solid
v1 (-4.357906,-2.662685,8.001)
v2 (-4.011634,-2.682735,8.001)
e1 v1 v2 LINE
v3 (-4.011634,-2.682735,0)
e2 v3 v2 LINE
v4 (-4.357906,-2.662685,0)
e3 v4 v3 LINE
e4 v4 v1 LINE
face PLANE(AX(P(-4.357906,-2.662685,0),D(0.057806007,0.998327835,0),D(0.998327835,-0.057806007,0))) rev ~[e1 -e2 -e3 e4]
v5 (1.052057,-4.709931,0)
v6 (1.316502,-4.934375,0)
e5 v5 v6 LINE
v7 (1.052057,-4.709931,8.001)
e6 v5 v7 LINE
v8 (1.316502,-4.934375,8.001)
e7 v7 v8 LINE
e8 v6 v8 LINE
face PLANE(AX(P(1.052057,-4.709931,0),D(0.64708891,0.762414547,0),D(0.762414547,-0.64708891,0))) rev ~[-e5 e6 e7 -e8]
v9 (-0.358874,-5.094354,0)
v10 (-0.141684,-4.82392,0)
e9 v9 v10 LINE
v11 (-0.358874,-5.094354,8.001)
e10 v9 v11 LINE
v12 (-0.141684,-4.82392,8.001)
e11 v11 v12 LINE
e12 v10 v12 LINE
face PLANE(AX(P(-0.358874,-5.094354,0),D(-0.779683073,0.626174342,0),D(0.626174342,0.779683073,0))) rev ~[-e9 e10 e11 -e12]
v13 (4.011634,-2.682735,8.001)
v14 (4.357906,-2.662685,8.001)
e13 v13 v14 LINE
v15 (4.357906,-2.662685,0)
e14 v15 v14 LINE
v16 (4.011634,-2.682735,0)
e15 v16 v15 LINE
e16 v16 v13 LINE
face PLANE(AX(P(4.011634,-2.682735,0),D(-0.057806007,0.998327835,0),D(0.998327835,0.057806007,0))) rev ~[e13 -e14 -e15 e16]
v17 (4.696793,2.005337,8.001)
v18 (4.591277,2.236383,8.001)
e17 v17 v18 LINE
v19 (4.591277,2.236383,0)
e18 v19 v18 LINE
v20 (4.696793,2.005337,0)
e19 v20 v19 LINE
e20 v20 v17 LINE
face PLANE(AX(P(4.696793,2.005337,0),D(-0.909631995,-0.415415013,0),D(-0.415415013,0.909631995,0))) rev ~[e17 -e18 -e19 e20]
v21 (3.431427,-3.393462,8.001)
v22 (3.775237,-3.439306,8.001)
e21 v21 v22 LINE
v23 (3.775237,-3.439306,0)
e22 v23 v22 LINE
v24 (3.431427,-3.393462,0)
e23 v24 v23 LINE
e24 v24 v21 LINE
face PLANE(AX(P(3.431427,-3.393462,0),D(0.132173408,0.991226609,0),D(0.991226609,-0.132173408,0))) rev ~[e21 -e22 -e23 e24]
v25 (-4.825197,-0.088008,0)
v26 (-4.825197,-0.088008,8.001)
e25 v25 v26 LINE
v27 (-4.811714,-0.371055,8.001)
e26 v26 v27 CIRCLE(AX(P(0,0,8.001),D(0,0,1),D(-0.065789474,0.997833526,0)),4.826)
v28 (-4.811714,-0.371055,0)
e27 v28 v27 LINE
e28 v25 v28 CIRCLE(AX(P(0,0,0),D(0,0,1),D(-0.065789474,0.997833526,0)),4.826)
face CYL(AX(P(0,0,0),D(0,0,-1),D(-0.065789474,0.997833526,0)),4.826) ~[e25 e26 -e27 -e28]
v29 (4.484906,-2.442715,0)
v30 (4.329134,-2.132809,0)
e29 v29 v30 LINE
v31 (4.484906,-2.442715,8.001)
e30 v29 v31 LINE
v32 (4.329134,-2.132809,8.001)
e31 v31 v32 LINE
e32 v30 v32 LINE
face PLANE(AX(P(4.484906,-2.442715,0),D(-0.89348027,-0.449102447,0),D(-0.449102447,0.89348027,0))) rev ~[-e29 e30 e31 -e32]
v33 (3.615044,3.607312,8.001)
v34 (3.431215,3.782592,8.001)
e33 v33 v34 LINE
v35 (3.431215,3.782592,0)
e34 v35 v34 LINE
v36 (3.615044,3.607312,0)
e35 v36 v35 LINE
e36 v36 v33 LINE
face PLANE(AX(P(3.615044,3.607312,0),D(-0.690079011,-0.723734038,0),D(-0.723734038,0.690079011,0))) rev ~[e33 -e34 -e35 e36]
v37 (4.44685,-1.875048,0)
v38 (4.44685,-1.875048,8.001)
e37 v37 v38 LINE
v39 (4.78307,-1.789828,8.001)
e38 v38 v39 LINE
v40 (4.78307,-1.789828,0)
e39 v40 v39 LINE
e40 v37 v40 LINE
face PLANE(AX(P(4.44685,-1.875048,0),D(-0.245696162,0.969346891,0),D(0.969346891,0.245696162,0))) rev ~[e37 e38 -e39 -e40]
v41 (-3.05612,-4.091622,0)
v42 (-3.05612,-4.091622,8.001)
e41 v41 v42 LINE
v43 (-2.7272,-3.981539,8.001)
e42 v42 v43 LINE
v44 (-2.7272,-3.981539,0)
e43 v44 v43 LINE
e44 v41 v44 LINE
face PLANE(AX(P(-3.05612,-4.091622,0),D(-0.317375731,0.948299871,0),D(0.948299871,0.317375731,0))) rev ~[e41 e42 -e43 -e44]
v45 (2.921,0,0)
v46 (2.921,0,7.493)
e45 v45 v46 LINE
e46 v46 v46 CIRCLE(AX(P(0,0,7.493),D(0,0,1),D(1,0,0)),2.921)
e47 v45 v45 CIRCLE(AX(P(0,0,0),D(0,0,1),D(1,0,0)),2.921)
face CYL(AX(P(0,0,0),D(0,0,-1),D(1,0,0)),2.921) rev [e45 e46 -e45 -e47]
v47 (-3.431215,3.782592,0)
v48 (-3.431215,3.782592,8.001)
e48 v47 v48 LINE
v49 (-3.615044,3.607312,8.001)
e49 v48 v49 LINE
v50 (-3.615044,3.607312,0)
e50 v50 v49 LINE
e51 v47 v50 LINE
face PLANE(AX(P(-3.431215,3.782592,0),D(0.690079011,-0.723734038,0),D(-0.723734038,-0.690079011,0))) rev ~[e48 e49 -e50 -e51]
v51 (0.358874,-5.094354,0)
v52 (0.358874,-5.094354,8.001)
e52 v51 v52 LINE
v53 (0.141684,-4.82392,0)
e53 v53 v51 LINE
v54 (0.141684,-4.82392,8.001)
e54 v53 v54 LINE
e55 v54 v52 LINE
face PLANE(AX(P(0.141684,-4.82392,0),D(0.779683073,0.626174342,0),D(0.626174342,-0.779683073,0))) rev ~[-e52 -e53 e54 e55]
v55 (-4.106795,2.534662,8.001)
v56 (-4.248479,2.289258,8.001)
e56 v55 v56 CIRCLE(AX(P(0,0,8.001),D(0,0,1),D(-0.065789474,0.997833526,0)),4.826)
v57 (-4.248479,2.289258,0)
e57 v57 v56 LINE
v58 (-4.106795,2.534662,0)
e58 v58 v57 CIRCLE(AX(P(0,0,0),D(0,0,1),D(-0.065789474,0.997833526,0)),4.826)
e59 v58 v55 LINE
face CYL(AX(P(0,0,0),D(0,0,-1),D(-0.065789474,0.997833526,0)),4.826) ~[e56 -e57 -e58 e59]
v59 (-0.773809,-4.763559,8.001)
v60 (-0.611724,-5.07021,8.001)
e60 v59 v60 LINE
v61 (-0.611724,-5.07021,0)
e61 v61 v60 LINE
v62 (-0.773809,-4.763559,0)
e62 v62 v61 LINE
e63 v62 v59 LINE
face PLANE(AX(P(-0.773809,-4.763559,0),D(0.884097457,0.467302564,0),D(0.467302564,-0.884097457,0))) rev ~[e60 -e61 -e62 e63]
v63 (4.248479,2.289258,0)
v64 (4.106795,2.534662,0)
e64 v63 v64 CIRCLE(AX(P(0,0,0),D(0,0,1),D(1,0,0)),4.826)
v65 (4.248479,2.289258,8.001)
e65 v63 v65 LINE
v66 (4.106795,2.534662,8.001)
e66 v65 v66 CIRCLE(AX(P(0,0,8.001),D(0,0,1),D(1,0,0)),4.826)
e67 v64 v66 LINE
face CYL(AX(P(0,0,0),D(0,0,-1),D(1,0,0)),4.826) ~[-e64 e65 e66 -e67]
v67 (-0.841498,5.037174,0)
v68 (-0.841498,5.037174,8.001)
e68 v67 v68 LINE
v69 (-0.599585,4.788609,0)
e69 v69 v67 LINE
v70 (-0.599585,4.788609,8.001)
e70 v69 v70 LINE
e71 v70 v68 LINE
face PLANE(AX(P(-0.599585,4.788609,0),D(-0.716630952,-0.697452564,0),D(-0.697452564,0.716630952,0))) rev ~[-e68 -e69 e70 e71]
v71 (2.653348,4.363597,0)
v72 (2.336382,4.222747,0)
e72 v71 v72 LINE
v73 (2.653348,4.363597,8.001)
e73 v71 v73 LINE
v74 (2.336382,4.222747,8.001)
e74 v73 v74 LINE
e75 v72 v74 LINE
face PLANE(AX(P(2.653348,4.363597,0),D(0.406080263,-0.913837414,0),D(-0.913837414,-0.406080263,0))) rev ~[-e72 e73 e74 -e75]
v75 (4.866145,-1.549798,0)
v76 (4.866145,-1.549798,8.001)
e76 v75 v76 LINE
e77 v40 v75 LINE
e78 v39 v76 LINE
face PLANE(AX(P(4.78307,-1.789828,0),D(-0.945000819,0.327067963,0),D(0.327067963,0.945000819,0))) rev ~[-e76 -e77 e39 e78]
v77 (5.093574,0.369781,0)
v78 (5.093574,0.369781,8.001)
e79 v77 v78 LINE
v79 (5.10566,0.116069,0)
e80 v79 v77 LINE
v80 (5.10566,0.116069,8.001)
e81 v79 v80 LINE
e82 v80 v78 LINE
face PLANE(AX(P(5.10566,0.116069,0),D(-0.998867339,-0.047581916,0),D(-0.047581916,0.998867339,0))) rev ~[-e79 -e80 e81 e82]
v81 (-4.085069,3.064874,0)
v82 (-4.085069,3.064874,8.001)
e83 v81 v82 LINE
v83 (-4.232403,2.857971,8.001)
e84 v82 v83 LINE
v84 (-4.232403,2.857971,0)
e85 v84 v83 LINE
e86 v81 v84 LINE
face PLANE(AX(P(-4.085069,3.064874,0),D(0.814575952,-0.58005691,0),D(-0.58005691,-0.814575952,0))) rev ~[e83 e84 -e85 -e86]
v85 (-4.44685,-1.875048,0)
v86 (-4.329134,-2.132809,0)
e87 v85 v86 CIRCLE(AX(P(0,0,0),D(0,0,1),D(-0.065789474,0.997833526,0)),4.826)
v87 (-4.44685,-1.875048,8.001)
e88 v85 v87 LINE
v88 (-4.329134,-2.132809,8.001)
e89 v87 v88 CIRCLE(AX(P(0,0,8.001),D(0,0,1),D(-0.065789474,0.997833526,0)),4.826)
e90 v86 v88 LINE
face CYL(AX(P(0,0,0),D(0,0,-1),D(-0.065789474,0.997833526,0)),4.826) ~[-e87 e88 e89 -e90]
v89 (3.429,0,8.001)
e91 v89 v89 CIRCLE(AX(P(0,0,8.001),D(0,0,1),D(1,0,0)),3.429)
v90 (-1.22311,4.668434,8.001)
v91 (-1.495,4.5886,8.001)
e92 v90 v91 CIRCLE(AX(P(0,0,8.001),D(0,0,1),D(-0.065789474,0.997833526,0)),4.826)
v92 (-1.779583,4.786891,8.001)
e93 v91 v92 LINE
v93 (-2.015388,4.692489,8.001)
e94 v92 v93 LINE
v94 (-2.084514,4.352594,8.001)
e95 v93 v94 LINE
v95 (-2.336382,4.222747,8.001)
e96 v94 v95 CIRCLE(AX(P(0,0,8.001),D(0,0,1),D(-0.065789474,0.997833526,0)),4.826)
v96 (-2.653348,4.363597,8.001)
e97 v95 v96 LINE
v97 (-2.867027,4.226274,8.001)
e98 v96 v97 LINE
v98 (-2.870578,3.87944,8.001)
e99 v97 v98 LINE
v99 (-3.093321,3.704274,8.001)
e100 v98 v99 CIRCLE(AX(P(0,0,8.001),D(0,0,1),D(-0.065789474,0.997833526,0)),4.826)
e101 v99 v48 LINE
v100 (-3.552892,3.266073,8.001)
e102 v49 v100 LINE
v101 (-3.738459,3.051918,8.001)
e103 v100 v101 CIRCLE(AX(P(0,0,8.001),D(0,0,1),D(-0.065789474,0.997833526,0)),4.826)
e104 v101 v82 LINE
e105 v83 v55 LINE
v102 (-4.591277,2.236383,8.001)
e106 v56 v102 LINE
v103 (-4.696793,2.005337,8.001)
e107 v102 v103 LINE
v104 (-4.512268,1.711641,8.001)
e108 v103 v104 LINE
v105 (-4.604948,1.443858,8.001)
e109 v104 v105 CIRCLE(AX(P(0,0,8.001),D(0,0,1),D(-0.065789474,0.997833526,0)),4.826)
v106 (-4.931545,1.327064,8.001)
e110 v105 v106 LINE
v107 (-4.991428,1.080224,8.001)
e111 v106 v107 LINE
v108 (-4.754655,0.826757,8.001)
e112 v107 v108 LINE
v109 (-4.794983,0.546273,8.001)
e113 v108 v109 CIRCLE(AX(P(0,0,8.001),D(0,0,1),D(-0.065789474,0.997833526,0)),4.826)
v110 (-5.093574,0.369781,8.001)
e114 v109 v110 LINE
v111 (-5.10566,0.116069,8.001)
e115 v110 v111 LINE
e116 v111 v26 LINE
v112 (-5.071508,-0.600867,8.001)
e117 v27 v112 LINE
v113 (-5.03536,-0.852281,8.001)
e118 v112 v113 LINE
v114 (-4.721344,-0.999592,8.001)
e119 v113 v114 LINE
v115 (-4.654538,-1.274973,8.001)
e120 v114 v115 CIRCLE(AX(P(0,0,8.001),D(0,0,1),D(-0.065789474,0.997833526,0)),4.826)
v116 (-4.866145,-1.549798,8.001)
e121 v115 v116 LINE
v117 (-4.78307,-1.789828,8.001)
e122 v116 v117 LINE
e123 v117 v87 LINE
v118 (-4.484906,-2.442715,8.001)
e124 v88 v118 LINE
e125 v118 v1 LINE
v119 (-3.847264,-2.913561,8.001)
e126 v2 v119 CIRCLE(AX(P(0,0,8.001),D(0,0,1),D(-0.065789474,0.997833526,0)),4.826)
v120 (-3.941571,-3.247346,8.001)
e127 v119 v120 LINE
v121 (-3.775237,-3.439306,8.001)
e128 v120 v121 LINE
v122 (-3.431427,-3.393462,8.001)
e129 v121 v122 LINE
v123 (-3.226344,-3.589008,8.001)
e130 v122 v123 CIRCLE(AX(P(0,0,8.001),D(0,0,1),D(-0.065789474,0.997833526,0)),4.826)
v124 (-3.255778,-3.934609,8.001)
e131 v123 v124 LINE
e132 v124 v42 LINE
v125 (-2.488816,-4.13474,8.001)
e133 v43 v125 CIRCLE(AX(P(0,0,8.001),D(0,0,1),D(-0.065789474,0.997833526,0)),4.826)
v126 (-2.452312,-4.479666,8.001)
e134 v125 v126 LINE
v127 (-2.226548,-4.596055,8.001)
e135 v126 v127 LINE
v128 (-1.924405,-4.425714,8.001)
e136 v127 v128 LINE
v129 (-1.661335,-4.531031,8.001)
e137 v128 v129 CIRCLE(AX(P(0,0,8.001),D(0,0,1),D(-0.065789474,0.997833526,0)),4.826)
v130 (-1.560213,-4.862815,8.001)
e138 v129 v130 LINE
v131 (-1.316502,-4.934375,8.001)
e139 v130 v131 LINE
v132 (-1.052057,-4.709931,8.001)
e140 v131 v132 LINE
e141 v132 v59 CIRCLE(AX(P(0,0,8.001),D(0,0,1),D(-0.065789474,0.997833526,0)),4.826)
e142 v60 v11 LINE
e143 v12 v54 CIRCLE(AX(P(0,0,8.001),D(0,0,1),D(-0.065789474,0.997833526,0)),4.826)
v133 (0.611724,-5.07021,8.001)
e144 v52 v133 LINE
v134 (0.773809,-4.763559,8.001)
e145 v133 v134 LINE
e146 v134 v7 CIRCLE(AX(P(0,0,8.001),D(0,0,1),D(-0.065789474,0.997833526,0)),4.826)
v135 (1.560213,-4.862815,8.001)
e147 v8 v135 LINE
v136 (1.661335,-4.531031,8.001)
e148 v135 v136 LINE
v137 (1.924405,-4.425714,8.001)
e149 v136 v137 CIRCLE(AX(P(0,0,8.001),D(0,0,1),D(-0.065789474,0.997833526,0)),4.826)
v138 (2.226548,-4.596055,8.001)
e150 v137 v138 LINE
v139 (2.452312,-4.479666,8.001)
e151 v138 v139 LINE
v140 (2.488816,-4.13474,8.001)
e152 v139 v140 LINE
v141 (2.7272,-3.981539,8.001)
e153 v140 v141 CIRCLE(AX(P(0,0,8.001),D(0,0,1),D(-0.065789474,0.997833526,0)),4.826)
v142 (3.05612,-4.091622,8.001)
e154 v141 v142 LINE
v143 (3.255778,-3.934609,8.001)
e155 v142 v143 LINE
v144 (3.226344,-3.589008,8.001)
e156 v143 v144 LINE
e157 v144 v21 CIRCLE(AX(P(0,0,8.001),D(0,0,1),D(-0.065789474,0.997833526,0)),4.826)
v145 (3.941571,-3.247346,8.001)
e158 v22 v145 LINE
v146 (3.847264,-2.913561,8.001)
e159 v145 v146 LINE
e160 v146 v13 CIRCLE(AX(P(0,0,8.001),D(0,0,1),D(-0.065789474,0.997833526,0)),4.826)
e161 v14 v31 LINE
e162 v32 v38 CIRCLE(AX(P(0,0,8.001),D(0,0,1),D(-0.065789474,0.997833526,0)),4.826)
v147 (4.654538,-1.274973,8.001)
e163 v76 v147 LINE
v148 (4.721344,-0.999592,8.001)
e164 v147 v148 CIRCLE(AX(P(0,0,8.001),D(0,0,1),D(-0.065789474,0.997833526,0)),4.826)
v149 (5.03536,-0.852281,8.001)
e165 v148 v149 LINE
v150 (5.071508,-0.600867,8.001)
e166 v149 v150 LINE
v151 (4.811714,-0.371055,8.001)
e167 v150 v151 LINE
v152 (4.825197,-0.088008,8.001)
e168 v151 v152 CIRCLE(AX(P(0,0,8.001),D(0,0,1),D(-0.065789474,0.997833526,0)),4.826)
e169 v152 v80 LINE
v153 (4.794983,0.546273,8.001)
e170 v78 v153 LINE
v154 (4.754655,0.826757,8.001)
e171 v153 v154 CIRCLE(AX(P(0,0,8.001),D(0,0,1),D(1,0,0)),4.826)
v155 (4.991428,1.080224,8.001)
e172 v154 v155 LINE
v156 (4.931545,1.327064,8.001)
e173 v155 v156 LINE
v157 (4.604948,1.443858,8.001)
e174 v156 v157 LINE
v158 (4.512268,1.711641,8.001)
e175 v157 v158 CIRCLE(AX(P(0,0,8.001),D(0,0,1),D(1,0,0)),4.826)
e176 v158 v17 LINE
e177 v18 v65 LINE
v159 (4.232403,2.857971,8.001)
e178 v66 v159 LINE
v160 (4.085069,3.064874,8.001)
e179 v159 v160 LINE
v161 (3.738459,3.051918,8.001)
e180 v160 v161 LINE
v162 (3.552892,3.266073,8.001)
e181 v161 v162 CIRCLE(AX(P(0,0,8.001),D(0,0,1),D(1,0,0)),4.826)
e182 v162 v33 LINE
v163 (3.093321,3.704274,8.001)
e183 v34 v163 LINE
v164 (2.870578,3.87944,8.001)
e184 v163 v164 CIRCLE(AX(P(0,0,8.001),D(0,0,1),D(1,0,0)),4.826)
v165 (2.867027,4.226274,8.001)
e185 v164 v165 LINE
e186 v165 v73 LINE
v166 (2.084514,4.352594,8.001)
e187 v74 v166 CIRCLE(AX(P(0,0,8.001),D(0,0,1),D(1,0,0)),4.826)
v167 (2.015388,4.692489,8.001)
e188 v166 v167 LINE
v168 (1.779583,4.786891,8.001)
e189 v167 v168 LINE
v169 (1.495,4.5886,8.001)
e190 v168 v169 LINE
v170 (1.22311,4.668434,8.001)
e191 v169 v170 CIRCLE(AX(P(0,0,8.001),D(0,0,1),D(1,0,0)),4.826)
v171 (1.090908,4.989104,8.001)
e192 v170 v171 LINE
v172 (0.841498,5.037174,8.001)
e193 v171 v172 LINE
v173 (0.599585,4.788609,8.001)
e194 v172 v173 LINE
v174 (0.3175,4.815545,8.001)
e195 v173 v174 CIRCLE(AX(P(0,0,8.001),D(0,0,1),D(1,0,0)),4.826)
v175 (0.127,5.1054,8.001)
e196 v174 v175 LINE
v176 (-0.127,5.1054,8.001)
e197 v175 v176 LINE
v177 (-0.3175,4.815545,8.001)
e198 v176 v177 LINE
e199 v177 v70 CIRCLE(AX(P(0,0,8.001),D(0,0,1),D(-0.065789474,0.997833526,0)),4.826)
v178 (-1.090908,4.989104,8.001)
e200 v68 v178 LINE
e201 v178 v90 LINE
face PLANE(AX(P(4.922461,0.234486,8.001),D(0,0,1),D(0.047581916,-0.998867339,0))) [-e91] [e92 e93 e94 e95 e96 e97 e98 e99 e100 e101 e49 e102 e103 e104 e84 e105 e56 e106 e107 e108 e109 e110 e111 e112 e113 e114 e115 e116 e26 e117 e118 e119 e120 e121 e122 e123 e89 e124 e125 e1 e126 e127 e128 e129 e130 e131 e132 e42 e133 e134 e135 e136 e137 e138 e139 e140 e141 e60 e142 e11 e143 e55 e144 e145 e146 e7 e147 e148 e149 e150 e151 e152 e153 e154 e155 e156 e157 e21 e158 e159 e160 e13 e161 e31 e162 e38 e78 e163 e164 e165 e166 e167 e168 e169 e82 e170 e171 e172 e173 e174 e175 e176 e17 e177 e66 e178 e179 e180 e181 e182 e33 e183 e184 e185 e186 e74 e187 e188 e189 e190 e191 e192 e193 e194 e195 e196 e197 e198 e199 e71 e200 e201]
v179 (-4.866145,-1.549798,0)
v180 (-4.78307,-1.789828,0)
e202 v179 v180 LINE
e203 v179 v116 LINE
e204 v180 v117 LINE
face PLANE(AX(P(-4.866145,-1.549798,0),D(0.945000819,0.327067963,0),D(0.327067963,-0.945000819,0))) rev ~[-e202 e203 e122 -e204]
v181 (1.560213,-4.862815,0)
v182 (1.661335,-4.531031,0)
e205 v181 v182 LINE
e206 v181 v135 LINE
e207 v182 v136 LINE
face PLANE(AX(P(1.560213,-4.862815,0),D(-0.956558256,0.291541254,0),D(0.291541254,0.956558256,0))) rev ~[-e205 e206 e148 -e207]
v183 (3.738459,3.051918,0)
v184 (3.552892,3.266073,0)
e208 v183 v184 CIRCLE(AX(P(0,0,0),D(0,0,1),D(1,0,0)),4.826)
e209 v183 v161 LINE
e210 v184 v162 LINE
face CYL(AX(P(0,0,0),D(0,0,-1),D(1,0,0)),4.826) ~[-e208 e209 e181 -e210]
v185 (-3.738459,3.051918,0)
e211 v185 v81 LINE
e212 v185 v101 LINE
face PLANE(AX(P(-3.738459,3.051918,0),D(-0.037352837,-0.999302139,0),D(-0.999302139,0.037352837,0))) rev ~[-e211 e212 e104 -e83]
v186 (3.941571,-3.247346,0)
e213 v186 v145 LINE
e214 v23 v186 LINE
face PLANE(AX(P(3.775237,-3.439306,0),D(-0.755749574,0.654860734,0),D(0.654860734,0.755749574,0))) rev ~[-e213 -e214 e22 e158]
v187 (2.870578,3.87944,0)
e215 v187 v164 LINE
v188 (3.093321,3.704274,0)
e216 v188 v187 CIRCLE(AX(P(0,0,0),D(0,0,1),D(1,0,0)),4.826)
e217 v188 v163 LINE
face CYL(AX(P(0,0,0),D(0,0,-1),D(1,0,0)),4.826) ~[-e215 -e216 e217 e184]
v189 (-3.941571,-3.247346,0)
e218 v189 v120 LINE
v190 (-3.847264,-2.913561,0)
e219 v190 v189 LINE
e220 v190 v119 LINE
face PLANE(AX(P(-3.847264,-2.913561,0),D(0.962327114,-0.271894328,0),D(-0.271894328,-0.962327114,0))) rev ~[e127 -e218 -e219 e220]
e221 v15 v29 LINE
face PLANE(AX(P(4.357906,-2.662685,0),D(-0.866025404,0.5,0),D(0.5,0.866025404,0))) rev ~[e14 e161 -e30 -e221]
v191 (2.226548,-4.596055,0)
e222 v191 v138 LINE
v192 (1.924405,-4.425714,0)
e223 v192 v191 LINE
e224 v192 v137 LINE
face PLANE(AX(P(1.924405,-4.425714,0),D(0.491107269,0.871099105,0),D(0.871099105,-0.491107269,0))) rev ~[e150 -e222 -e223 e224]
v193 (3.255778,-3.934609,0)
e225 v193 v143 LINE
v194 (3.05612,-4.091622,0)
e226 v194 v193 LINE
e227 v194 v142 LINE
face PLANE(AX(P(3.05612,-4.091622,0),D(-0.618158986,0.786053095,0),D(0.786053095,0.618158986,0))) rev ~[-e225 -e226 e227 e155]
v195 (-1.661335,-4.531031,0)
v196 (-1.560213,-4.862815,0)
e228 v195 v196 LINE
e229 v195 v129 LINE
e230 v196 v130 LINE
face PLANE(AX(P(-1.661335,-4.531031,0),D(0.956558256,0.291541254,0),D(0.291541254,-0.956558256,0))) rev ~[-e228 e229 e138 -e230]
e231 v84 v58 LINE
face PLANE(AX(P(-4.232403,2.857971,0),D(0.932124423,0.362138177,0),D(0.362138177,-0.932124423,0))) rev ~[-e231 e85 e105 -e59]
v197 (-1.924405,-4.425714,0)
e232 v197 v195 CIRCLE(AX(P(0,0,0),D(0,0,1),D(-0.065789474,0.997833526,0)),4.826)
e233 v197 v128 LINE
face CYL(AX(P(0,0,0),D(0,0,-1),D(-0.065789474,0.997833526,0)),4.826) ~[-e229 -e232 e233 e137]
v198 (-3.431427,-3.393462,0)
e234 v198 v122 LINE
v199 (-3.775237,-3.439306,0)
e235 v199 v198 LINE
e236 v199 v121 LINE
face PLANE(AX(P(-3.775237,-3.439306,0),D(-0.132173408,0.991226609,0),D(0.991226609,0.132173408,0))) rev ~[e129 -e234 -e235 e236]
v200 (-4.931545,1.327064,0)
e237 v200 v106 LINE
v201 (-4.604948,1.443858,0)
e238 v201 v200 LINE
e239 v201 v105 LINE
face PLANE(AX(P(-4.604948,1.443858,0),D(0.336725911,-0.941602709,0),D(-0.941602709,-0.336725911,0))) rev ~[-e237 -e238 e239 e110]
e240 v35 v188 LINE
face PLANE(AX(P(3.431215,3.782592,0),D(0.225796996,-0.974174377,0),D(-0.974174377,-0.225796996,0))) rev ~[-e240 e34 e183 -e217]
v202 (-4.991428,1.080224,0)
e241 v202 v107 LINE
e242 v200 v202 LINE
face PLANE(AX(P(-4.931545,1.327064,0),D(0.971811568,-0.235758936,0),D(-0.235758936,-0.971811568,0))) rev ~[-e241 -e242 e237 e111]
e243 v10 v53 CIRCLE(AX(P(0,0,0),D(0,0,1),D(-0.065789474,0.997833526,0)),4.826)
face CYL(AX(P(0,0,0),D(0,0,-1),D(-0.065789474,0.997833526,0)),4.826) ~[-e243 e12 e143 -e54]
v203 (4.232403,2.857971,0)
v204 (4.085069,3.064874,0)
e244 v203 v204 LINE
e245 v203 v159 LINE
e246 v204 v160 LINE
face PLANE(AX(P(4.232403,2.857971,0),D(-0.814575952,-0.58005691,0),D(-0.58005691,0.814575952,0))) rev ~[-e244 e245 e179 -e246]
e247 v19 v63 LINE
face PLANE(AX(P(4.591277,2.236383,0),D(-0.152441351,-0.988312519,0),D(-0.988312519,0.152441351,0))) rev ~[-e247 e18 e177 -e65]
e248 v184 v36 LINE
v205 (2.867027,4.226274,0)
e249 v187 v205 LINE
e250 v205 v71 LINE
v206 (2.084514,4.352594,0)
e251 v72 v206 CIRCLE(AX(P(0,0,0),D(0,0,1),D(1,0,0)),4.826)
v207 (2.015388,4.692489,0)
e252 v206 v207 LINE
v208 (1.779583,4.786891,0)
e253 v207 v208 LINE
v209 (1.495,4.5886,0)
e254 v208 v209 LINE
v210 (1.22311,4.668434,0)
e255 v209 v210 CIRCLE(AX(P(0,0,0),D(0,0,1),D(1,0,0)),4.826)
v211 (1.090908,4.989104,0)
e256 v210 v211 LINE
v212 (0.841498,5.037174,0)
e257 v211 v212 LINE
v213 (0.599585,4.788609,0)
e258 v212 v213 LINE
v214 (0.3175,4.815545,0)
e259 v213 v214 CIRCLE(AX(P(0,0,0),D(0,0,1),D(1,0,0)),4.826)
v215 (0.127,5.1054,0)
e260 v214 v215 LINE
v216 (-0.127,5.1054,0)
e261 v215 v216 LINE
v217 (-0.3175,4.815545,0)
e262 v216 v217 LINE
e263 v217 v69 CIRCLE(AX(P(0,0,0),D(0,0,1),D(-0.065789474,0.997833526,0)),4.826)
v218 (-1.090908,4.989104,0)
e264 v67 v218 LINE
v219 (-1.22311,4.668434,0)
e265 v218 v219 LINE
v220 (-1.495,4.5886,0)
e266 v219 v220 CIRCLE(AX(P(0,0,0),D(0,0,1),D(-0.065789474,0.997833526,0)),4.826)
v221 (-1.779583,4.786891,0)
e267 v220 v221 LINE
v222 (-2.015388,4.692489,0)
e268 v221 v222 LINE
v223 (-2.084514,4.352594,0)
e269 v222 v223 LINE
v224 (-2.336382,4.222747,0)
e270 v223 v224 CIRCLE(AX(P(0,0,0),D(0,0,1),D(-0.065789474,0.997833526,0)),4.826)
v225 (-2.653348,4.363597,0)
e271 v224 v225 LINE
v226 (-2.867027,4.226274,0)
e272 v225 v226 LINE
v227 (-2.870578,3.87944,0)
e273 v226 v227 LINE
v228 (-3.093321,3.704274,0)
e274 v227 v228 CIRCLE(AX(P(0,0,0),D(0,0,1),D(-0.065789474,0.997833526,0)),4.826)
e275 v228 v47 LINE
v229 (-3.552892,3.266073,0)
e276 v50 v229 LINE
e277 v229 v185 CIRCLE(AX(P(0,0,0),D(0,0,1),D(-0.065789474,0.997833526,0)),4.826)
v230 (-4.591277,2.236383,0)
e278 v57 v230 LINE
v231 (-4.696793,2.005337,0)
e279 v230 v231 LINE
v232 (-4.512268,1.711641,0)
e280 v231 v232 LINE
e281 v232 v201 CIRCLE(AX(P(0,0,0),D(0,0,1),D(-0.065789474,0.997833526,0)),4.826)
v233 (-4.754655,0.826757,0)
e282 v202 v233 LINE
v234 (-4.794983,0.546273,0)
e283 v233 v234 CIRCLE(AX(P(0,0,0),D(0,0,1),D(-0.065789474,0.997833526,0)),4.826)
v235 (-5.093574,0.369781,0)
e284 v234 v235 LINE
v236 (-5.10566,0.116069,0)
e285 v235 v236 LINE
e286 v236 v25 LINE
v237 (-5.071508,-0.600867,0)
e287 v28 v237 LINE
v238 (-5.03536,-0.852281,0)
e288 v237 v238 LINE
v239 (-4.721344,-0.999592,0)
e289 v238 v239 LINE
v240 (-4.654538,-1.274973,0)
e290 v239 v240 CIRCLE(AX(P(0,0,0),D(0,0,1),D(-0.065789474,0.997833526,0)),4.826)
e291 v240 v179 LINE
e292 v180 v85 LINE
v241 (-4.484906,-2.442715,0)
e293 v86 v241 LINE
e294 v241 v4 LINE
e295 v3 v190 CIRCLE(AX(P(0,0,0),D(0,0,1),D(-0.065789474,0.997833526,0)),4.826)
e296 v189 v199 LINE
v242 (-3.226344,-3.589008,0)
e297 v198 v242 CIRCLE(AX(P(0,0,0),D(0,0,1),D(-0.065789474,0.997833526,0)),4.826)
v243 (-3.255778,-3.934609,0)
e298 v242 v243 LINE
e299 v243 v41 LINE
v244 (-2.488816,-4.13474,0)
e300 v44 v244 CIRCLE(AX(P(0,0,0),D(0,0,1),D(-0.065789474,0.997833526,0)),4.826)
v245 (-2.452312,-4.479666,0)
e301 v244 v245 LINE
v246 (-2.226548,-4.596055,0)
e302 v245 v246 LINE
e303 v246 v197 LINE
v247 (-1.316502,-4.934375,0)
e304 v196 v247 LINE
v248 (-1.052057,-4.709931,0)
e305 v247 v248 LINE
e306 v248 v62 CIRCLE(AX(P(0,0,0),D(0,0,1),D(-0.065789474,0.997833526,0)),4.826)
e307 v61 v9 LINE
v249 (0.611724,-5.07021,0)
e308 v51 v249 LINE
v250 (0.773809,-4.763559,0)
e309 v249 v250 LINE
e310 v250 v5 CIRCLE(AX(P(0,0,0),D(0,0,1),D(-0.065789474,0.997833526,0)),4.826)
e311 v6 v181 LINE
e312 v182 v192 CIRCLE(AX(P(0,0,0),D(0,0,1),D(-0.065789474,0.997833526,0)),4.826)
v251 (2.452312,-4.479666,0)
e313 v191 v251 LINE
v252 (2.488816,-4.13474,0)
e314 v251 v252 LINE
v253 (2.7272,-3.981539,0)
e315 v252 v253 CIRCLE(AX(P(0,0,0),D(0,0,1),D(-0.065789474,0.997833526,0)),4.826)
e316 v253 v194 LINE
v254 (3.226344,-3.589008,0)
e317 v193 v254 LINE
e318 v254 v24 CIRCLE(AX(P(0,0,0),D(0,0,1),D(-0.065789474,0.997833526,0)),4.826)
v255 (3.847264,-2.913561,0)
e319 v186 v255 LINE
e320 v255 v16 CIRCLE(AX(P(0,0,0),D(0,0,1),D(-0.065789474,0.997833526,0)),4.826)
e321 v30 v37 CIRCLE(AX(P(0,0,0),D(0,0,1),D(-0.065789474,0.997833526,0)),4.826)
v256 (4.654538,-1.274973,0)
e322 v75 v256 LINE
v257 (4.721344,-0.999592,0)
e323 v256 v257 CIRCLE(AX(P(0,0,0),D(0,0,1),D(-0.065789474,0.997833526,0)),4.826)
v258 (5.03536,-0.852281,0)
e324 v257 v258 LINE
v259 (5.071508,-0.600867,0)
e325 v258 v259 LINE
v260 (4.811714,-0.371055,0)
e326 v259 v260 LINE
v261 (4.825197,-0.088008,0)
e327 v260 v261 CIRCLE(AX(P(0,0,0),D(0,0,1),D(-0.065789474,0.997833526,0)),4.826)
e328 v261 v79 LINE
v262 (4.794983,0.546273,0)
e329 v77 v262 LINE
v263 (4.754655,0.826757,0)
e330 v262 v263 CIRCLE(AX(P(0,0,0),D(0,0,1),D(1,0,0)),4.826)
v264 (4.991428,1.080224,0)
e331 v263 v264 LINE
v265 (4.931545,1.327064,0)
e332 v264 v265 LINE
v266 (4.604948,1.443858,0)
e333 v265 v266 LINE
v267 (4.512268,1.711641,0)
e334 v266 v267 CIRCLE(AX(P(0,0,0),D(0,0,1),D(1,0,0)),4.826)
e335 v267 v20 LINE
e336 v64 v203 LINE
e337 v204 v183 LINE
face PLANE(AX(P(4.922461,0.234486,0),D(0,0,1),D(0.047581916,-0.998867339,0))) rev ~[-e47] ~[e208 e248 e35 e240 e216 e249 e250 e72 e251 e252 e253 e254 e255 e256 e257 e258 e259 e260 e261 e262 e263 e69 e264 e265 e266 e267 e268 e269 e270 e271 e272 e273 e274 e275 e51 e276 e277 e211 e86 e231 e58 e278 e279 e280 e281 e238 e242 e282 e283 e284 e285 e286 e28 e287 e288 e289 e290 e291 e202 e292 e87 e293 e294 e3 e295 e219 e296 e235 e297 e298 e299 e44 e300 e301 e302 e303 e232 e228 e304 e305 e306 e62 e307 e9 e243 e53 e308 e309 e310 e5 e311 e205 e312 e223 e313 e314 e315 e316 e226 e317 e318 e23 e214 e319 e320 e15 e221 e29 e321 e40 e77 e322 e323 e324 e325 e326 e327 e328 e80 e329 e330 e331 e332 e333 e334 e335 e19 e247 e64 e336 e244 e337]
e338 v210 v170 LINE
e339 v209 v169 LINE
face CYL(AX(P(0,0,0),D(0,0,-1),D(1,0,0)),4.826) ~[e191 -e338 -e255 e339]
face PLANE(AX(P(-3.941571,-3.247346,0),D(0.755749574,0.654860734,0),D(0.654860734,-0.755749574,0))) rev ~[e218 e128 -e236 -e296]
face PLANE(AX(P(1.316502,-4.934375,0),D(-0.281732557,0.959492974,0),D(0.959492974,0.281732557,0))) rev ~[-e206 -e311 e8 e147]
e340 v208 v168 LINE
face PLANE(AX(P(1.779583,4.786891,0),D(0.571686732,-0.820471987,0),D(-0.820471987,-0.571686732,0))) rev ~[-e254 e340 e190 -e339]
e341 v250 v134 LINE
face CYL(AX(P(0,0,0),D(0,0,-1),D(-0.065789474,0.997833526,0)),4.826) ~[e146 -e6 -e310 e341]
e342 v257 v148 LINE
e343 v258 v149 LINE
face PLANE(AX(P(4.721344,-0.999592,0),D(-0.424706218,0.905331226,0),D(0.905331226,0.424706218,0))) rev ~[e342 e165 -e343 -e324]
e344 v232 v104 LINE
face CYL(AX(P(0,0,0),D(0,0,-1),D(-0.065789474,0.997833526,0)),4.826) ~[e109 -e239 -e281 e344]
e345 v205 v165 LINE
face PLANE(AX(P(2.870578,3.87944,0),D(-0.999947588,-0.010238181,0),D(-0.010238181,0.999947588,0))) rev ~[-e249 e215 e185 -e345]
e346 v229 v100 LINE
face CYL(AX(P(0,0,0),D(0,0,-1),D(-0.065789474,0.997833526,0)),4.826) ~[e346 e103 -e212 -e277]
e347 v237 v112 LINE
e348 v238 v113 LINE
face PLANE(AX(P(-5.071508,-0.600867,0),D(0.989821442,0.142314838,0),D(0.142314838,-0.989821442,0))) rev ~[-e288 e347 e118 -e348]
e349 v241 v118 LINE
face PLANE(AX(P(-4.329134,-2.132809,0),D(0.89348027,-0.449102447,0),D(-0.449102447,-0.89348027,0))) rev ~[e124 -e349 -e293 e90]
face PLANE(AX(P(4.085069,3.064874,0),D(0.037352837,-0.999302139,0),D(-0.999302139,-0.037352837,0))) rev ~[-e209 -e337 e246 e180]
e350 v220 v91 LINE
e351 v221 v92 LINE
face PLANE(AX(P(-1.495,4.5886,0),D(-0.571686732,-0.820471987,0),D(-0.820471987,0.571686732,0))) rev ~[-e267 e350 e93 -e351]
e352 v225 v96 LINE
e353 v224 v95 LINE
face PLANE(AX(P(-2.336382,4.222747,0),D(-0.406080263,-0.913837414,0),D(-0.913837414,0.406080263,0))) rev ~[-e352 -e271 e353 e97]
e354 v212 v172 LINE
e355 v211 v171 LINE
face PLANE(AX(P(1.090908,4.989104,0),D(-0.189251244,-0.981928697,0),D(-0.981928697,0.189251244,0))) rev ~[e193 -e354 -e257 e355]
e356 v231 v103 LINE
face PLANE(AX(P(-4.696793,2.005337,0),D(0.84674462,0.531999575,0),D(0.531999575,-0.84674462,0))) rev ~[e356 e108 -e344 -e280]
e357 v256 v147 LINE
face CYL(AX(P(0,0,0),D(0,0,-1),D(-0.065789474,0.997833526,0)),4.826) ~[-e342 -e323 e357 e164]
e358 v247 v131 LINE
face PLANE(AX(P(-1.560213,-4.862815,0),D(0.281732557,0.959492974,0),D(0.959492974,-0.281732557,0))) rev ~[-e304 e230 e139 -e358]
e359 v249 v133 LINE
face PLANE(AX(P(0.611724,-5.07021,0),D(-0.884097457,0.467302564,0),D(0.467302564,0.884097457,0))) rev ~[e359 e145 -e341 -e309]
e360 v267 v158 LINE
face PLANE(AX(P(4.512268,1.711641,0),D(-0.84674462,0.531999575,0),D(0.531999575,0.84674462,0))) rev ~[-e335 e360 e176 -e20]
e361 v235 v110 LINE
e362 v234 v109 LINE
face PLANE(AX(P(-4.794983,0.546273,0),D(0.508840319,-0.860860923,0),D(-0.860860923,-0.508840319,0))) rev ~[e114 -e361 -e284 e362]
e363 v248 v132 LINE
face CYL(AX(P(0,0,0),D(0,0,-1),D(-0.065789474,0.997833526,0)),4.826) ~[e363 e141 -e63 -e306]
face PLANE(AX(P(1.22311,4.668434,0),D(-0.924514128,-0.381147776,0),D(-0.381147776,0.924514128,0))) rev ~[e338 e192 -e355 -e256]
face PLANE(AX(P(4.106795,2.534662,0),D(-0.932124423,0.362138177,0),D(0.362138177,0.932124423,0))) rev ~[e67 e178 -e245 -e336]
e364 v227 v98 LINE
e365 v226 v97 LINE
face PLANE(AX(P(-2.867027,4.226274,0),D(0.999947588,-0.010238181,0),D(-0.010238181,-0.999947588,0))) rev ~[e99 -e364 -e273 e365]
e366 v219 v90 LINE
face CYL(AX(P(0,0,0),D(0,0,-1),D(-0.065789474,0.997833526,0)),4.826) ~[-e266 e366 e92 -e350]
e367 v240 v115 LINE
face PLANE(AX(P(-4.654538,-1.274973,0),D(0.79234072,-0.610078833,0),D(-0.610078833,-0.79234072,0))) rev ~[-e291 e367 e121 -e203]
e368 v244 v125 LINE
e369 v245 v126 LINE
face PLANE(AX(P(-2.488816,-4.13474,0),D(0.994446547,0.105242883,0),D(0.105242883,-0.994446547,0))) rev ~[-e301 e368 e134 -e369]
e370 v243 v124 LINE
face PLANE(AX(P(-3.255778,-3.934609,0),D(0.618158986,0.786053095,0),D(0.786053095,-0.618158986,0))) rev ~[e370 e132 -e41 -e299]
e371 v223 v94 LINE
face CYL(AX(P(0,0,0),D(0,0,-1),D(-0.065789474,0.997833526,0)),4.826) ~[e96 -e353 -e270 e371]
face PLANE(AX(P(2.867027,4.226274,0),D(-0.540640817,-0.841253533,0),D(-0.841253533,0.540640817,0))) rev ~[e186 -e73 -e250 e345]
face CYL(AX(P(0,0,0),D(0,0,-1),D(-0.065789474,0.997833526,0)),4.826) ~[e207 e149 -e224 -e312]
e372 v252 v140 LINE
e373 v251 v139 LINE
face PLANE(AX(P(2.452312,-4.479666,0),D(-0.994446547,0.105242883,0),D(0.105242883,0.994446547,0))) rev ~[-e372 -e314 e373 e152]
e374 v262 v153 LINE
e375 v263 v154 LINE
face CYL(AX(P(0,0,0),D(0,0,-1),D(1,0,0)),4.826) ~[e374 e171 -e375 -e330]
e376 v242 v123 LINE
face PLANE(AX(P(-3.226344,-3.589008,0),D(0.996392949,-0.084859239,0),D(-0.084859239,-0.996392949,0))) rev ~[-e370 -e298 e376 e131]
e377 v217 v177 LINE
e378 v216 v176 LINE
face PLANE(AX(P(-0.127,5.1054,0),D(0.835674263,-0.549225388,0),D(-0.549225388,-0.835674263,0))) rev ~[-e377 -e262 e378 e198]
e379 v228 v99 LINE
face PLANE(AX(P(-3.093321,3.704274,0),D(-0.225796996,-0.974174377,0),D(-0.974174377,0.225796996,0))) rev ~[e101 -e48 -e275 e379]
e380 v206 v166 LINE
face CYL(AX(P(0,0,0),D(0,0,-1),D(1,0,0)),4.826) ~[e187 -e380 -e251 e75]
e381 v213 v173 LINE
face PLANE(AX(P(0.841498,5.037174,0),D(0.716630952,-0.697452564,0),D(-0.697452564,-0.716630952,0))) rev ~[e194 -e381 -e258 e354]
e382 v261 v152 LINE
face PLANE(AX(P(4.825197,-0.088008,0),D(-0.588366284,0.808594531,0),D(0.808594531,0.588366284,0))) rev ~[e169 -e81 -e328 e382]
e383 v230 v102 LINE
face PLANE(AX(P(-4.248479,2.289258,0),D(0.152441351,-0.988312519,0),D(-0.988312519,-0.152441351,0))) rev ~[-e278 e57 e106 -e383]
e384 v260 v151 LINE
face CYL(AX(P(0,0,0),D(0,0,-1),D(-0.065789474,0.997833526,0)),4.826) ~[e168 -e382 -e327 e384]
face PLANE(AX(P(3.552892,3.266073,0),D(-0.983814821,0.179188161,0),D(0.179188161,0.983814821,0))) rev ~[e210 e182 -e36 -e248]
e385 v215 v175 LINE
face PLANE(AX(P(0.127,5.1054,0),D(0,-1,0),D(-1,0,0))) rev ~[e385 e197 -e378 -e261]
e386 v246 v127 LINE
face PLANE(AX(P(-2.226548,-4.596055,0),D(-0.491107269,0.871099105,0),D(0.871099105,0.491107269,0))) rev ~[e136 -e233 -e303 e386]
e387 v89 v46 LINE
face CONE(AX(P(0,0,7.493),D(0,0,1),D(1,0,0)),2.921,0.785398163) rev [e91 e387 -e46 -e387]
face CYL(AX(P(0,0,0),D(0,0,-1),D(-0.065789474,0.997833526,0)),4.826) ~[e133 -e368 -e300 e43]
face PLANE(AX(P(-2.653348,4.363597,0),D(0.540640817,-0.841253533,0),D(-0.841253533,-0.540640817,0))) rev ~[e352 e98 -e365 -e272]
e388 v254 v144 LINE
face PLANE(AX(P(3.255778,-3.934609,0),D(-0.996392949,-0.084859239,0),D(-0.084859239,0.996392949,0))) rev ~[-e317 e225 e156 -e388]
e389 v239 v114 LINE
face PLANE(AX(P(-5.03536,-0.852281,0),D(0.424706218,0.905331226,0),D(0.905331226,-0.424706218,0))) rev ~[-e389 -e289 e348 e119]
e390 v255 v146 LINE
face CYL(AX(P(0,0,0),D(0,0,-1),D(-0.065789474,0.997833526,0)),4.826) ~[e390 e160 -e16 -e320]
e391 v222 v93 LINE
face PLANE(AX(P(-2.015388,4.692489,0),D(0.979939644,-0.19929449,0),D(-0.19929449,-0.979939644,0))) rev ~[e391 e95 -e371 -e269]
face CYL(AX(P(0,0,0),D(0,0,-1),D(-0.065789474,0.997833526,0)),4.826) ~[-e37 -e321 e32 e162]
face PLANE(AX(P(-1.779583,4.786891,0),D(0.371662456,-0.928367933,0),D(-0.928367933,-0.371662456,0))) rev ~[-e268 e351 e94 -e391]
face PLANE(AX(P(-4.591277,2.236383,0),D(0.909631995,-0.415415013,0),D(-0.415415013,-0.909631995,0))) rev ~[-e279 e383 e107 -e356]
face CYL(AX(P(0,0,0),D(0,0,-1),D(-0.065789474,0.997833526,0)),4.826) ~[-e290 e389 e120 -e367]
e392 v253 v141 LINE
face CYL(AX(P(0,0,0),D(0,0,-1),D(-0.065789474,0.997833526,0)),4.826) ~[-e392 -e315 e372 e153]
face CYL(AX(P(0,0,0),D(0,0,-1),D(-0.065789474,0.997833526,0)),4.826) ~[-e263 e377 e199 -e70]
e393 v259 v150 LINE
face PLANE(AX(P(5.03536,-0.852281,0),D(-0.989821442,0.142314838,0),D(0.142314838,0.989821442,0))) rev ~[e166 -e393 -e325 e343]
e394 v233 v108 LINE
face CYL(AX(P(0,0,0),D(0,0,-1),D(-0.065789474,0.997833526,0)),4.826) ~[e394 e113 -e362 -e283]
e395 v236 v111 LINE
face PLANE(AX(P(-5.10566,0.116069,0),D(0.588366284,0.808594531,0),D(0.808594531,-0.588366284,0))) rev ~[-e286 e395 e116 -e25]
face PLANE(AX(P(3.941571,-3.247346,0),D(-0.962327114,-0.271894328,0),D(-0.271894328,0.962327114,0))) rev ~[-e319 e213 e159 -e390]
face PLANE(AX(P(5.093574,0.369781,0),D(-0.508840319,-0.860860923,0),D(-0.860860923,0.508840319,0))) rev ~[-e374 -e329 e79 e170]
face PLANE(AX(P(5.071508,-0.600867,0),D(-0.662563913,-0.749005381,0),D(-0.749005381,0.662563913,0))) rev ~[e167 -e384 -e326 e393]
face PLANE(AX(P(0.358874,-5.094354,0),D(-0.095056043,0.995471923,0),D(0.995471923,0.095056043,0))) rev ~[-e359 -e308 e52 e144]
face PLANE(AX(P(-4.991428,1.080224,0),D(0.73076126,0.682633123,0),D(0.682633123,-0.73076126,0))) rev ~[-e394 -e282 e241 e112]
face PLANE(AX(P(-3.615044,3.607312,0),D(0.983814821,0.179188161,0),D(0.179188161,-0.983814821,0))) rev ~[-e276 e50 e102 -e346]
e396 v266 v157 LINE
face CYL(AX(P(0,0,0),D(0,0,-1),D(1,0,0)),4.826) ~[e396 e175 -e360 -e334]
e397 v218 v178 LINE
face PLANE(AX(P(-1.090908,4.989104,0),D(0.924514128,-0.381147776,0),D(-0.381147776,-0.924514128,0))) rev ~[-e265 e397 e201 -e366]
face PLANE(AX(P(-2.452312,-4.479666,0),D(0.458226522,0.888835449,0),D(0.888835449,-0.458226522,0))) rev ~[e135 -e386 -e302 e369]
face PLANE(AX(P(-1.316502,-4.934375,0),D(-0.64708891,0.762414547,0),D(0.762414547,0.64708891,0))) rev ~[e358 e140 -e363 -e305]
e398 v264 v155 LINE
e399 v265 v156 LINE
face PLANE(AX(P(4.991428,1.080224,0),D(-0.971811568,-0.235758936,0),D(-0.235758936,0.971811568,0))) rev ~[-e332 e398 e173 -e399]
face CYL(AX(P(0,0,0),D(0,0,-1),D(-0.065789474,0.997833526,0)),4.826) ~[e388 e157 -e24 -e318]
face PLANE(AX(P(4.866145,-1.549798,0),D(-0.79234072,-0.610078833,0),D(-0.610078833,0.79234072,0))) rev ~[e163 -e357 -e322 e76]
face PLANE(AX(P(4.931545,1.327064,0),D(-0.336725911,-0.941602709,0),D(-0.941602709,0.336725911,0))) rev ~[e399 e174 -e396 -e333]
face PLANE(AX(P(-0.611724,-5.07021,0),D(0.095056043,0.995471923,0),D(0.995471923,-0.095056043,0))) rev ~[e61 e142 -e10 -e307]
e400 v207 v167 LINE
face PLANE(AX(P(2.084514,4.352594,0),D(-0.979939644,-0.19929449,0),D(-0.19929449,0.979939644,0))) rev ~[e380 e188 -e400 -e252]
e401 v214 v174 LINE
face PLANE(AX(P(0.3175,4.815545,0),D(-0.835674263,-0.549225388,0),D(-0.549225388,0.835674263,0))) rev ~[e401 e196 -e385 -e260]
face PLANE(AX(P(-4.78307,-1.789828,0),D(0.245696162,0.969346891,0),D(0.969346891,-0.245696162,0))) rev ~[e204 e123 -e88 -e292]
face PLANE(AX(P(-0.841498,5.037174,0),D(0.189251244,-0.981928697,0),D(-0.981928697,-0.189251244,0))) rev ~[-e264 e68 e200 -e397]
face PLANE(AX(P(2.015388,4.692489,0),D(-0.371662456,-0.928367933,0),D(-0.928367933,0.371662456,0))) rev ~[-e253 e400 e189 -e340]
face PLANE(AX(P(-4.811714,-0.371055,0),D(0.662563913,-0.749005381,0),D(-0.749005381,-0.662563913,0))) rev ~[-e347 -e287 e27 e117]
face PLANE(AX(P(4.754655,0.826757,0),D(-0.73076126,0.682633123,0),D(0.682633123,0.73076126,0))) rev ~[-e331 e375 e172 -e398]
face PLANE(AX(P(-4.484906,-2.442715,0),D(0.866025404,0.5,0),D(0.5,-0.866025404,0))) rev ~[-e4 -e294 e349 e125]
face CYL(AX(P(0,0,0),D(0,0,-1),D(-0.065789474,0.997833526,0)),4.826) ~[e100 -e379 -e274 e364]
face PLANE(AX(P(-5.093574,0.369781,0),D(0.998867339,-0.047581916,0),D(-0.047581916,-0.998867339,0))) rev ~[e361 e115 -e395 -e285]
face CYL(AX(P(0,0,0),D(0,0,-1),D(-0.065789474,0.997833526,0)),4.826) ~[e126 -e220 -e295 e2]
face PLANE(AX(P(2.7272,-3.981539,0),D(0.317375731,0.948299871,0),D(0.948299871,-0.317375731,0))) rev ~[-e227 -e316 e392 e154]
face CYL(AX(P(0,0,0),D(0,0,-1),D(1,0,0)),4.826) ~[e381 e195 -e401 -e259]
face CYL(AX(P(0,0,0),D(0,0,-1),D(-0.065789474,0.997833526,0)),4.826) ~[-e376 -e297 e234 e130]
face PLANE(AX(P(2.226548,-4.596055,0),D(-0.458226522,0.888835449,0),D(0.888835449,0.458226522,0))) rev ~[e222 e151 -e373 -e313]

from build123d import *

# Parameters (mm, degrees)
F0_R            = 2.921
F1_DEPTH        = 8.001
F2_DEPTH        = 8.001
F2_COPIES_COUNT = 33
F3_SIZE         = 0.508


# Not quite as in the source:
# - a pattern or mirror of a feature is missing from the dataset's text; its kind, count and spacing are read off the source's solid


with BuildPart() as f1:
    # F0 (on Top) → F1 (new body)
    with BuildSketch(Plane.XY):
        with BuildLine():
            ThreePointArc((-0.3175, 4.8155445954), (-3.298334504, -3.5229626027), (4.826, 0))
            ThreePointArc((4.826, 0), (3.5229626027, 3.298334504), (0.3175, 4.8155445954))
            ThreePointArc((0.3175, 4.8155445954), (0, 4.826), (-0.3175, 4.8155445954))
        make_face()
        Circle(F0_R, mode=Mode.SUBTRACT)
    extrude(amount=F1_DEPTH)

    # F0 (on Top) → F2 (join, through all)
    with BuildSketch(Plane.XY):
        with BuildLine():
            ThreePointArc((-0.3175, 4.8155445954), (0, 4.826), (0.3175, 4.8155445954))
            Line((0.3175, 4.8155445954), (0.127, 5.1054))
            Line((0.127, 5.1054), (-0.127, 5.1054))
            Line((-0.127, 5.1054), (-0.3175, 4.8155445954))
        make_face()
    f2 = extrude(amount=F2_DEPTH)

    # F2_copies: F2 ×33 about axis
    f2_copies_axis = Axis((0, 0, 0), (0, 0, 1))
    for i in range(1, F2_COPIES_COUNT):
        add(f2.rotate(f2_copies_axis, i * 360 / F2_COPIES_COUNT))

    # F3
    f3_edges = [f1.edges().sort_by_distance(p)[0] for p in [
        (-2.921, 0, 8.001),
    ]]
    chamfer(f3_edges, length=F3_SIZE)


solid = f1.part
